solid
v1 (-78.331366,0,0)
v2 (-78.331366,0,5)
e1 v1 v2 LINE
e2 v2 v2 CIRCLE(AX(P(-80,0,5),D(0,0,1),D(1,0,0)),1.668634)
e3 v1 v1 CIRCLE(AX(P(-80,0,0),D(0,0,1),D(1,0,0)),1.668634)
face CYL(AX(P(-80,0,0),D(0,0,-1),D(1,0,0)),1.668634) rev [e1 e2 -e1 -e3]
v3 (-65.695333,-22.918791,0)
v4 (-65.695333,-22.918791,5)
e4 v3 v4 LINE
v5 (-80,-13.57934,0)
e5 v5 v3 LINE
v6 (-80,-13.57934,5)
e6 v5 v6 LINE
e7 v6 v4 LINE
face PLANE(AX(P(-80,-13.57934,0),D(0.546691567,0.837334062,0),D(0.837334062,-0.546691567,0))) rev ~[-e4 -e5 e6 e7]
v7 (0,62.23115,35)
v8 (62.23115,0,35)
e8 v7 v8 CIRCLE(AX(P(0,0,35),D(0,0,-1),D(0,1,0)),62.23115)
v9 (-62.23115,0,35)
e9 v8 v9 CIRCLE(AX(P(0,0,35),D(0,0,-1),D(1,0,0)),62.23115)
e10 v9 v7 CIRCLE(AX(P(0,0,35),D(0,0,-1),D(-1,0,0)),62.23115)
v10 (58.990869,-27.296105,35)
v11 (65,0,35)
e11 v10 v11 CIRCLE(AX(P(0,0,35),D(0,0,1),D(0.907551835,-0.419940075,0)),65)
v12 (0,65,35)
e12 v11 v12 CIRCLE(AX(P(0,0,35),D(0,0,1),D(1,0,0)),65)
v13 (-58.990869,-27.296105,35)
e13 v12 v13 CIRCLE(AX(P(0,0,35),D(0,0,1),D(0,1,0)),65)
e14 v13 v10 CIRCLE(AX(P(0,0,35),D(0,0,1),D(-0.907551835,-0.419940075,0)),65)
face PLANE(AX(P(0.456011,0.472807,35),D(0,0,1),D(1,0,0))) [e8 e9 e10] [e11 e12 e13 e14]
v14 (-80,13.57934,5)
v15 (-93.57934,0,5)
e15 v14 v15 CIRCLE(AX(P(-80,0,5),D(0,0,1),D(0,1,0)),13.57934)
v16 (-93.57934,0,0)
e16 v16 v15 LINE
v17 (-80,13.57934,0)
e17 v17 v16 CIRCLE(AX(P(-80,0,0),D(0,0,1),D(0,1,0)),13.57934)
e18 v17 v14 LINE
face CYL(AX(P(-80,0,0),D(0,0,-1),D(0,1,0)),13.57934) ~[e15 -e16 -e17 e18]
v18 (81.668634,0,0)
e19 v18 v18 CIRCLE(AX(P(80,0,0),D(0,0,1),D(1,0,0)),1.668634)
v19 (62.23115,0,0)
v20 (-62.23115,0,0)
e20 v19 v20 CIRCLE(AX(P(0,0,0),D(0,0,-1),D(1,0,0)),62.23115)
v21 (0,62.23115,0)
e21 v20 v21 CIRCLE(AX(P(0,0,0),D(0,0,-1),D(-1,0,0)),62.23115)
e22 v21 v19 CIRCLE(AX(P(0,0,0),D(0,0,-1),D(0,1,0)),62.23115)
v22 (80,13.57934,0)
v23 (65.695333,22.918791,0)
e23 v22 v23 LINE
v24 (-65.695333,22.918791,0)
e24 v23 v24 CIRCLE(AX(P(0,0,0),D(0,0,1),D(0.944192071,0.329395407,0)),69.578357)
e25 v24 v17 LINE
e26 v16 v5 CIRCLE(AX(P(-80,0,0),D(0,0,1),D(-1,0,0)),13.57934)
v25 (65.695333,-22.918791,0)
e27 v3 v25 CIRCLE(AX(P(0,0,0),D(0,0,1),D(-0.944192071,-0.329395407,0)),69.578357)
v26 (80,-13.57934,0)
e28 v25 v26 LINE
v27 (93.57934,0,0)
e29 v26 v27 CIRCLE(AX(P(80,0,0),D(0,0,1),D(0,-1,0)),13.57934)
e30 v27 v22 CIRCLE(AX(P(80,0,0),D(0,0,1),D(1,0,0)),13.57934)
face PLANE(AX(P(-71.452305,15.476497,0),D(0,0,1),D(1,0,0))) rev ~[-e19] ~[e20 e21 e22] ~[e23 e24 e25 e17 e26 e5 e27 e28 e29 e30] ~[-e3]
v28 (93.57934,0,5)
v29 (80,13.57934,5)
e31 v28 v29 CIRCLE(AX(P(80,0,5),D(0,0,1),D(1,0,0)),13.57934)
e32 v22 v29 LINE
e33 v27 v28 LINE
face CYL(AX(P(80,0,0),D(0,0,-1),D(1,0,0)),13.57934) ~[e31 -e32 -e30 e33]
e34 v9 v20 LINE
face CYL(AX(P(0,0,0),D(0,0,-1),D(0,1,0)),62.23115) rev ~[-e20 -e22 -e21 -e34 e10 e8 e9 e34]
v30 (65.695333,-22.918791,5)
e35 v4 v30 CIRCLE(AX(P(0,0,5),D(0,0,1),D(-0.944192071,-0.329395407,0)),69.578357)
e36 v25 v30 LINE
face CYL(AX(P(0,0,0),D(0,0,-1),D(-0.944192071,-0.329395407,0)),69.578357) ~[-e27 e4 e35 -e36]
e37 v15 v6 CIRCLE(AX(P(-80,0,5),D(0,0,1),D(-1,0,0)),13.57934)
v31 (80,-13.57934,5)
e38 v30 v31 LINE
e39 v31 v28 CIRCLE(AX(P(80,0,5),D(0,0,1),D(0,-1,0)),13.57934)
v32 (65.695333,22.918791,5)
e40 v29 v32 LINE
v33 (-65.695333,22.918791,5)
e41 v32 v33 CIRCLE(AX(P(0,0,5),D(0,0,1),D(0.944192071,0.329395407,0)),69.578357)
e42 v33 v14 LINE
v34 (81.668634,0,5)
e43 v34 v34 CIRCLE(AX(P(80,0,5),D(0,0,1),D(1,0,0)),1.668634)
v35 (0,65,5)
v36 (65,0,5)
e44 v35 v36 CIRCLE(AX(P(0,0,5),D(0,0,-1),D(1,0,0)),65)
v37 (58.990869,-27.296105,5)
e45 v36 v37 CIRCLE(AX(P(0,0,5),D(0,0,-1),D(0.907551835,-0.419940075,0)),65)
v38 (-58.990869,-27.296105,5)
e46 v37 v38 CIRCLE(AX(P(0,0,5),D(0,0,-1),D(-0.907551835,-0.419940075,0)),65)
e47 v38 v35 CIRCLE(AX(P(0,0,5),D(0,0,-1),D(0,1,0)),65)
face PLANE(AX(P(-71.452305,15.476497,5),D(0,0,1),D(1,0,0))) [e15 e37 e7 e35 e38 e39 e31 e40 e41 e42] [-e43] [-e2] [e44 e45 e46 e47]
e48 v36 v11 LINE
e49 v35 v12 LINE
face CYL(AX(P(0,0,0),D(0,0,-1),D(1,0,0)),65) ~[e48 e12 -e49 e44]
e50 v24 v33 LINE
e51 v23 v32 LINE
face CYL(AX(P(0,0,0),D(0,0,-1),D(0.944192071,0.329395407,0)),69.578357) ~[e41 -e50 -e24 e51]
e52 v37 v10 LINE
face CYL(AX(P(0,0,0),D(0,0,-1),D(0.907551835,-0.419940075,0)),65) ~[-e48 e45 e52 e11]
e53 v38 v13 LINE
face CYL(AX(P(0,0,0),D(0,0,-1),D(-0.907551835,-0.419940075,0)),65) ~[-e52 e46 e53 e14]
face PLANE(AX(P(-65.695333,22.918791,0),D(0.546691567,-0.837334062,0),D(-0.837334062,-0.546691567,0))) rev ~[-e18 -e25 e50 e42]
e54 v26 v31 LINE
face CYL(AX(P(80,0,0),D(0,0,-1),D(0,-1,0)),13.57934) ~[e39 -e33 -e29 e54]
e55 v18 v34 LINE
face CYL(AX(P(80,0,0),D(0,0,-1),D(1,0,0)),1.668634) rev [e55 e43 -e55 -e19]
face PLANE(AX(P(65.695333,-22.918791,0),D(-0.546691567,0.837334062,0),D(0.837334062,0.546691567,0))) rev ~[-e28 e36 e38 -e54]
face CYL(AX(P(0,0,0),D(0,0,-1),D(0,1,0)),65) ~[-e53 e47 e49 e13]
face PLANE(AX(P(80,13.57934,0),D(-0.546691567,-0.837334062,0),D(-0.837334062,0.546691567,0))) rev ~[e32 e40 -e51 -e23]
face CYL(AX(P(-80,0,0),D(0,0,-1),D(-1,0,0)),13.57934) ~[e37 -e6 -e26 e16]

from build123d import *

# Parameters (mm, degrees)
F1_DEPTH = 5
F0_R     = 1.6686337588
F2_DEPTH = 5
F3_DEPTH = 35


with BuildPart() as f1:
    # F0 (on Top) → F1 (new body)
    with BuildSketch(Plane.XY):
        with BuildLine():
            ThreePointArc((58.9908692784, -27.2961048829), (63.4799436952, -13.9748613035), (65, 0))
            ThreePointArc((65, 0), (63.4799436952, 13.9748613035), (58.9908692784, 27.2961048829))
            ThreePointArc((58.9908692784, 27.2961048829), (35.0053794624, 54.7688178501), (0, 65))
            ThreePointArc((0, 65), (-35.0053794624, 54.7688178501), (-58.9908692784, 27.2961048829))
            ThreePointArc((-58.9908692784, 27.2961048829), (-63.4799436952, 13.9748613035), (-65, 0))
            ThreePointArc((-65, 0), (-63.4799436952, -13.9748613035), (-58.9908692784, -27.2961048829))
            ThreePointArc((-58.9908692784, -27.2961048829), (0, -65), (58.9908692784, -27.2961048829))
        make_face()
        with BuildLine():
            ThreePointArc((-62.231150434, 0), (-44.0040684729, 44.0040684729), (0, 62.231150434))
            ThreePointArc((0, 62.231150434), (44.0040684729, 44.0040684729), (62.231150434, 0))
            ThreePointArc((62.231150434, 0), (0, -62.231150434), (-62.231150434, 0))
        make_face(mode=Mode.SUBTRACT)
        with BuildLine():
            ThreePointArc((58.9908692784, 27.2961048829), (63.4799436952, 13.9748613035), (65, 0))
            Line((65, 0), (66.4206601738, 0))
            ThreePointArc((66.4206601738, 0), (67.1091179562, 4.268914411), (69.1046831796, 8.1049701726))
            ThreePointArc((69.1046831796, 8.1049701726), (67.8057771791, 15.6052670592), (65.6953330705, 22.9187912336))
            Line((65.6953330705, 22.9187912336), (58.9908692784, 27.2961048829))
        make_face()
        with BuildLine():
            Line((66.4206601738, 0), (65, 0))
            ThreePointArc((65, 0), (63.4799436952, -13.9748613035), (58.9908692784, -27.2961048829))
            Line((58.9908692784, -27.2961048829), (65.6953330705, -22.9187912336))
            ThreePointArc((65.6953330705, -22.9187912336), (67.8057771791, -15.6052670592), (69.1046831796, -8.1049701726))
            ThreePointArc((69.1046831796, -8.1049701726), (67.1091179562, -4.268914411), (66.4206601738, 0))
        make_face()
        with BuildLine():
            ThreePointArc((0, 65), (35.0053794624, 54.7688178501), (58.9908692784, 27.2961048829))
            Line((58.9908692784, 27.2961048829), (65.6953330705, 22.9187912336))
            ThreePointArc((65.6953330705, 22.9187912336), (0, 69.5783571152), (-65.6953330705, 22.9187912336))
            Line((-65.6953330705, 22.9187912336), (-58.9908692784, 27.2961048829))
            ThreePointArc((-58.9908692784, 27.2961048829), (-35.0053794624, 54.7688178501), (0, 65))
        make_face()
        with BuildLine():
            ThreePointArc((69.1046831796, 8.1049701726), (67.1091179562, 4.268914411), (66.4206601738, 0))
            ThreePointArc((66.4206601738, 0), (67.1091179562, -4.268914411), (69.1046831796, -8.1049701726))
            ThreePointArc((69.1046831796, -8.1049701726), (69.4598376886, -4.0593998478), (69.5783571152, 0))
            ThreePointArc((69.5783571152, 0), (69.4598376886, 4.0593998478), (69.1046831796, 8.1049701726))
        make_face()
        with BuildLine():
            Line((65.6953330705, -22.9187912336), (58.9908692784, -27.2961048829))
            ThreePointArc((58.9908692784, -27.2961048829), (0, -65), (-58.9908692784, -27.2961048829))
            Line((-58.9908692784, -27.2961048829), (-65.6953330705, -22.9187912336))
            ThreePointArc((-65.6953330705, -22.9187912336), (0, -69.5783571152), (65.6953330705, -22.9187912336))
        make_face()
        with BuildLine():
            Line((-65.6953330705, -22.9187912336), (-58.9908692784, -27.2961048829))
            ThreePointArc((-58.9908692784, -27.2961048829), (-63.4799436952, -13.9748613035), (-65, 0))
            Line((-65, 0), (-66.4206601738, 0))
            ThreePointArc((-66.4206601738, 0), (-67.1091179562, -4.268914411), (-69.1046831796, -8.1049701726))
            ThreePointArc((-69.1046831796, -8.1049701726), (-67.8057771791, -15.6052670592), (-65.6953330705, -22.9187912336))
        make_face()
        with BuildLine():
            ThreePointArc((-65, 0), (-63.4799436952, 13.9748613035), (-58.9908692784, 27.2961048829))
            Line((-58.9908692784, 27.2961048829), (-65.6953330705, 22.9187912336))
            ThreePointArc((-65.6953330705, 22.9187912336), (-67.8057771791, 15.6052670592), (-69.1046831796, 8.1049701726))
            ThreePointArc((-69.1046831796, 8.1049701726), (-67.1091179562, 4.268914411), (-66.4206601738, 0))
            Line((-66.4206601738, 0), (-65, 0))
        make_face()
        with BuildLine():
            ThreePointArc((-66.4206601738, 0), (-67.1091179562, 4.268914411), (-69.1046831796, 8.1049701726))
            ThreePointArc((-69.1046831796, 8.1049701726), (-69.5783571152, 0), (-69.1046831796, -8.1049701726))
            ThreePointArc((-69.1046831796, -8.1049701726), (-67.1091179562, -4.268914411), (-66.4206601738, 0))
        make_face()
    extrude(amount=F1_DEPTH)

    # F0 (on Top) → F2 (join)
    with BuildSketch(Plane.XY):
        with BuildLine():
            ThreePointArc((-69.1046831796, 8.1049701726), (-67.8057771791, 15.6052670592), (-65.6953330705, 22.9187912336))
            Line((-65.6953330705, 22.9187912336), (-80, 13.5793398262))
            ThreePointArc((-80, 13.5793398262), (-73.9033482197, 12.133808437), (-69.1046831796, 8.1049701726))
        make_face()
        with BuildLine():
            ThreePointArc((-69.1046831796, 8.1049701726), (-73.9033482197, 12.133808437), (-80, 13.5793398262))
            ThreePointArc((-80, 13.5793398262), (-89.6020432751, 9.6020432751), (-93.5793398262, 0))
            ThreePointArc((-93.5793398262, 0), (-89.6020432751, -9.6020432751), (-80, -13.5793398262))
            ThreePointArc((-80, -13.5793398262), (-73.9033482197, -12.133808437), (-69.1046831796, -8.1049701726))
            ThreePointArc((-69.1046831796, -8.1049701726), (-69.5783571152, 0), (-69.1046831796, 8.1049701726))
        make_face()
        with Locations((-80, 0)):
            Circle(F0_R, mode=Mode.SUBTRACT)
        with BuildLine():
            Line((-80, -13.5793398262), (-65.6953330705, -22.9187912336))
            ThreePointArc((-65.6953330705, -22.9187912336), (-67.8057771791, -15.6052670592), (-69.1046831796, -8.1049701726))
            ThreePointArc((-69.1046831796, -8.1049701726), (-73.9033482197, -12.133808437), (-80, -13.5793398262))
        make_face()
        with BuildLine():
            ThreePointArc((80, -13.5793398262), (73.9033482197, -12.133808437), (69.1046831796, -8.1049701726))
            ThreePointArc((69.1046831796, -8.1049701726), (67.8057771791, -15.6052670592), (65.6953330705, -22.9187912336))
            Line((65.6953330705, -22.9187912336), (80, -13.5793398262))
        make_face()
        with BuildLine():
            ThreePointArc((80, 13.5793398262), (73.9033482197, 12.133808437), (69.1046831796, 8.1049701726))
            ThreePointArc((69.1046831796, 8.1049701726), (69.4598376886, 4.0593998478), (69.5783571152, 0))
            ThreePointArc((69.5783571152, 0), (69.4598376886, -4.0593998478), (69.1046831796, -8.1049701726))
            ThreePointArc((69.1046831796, -8.1049701726), (73.9033482197, -12.133808437), (80, -13.5793398262))
            ThreePointArc((80, -13.5793398262), (89.6020432751, -9.6020432751), (93.5793398262, 0))
            ThreePointArc((93.5793398262, 0), (89.6020432751, 9.6020432751), (80, 13.5793398262))
        make_face()
        with Locations((80, 0)):
            Circle(F0_R, mode=Mode.SUBTRACT)
        with BuildLine():
            Line((80, 13.5793398262), (65.6953330705, 22.9187912336))
            ThreePointArc((65.6953330705, 22.9187912336), (67.8057771791, 15.6052670592), (69.1046831796, 8.1049701726))
            ThreePointArc((69.1046831796, 8.1049701726), (73.9033482197, 12.133808437), (80, 13.5793398262))
        make_face()
    extrude(amount=F2_DEPTH)

    # F0 (on Top) → F3 (join)
    with BuildSketch(Plane.XY):
        with BuildLine():
            ThreePointArc((58.9908692784, -27.2961048829), (63.4799436952, -13.9748613035), (65, 0))
            ThreePointArc((65, 0), (63.4799436952, 13.9748613035), (58.9908692784, 27.2961048829))
            ThreePointArc((58.9908692784, 27.2961048829), (35.0053794624, 54.7688178501), (0, 65))
            ThreePointArc((0, 65), (-35.0053794624, 54.7688178501), (-58.9908692784, 27.2961048829))
            ThreePointArc((-58.9908692784, 27.2961048829), (-63.4799436952, 13.9748613035), (-65, 0))
            ThreePointArc((-65, 0), (-63.4799436952, -13.9748613035), (-58.9908692784, -27.2961048829))
            ThreePointArc((-58.9908692784, -27.2961048829), (0, -65), (58.9908692784, -27.2961048829))
        make_face()
        with BuildLine():
            ThreePointArc((-62.231150434, 0), (-44.0040684729, 44.0040684729), (0, 62.231150434))
            ThreePointArc((0, 62.231150434), (44.0040684729, 44.0040684729), (62.231150434, 0))
            ThreePointArc((62.231150434, 0), (0, -62.231150434), (-62.231150434, 0))
        make_face(mode=Mode.SUBTRACT)
    extrude(amount=F3_DEPTH)


solid = f1.part
